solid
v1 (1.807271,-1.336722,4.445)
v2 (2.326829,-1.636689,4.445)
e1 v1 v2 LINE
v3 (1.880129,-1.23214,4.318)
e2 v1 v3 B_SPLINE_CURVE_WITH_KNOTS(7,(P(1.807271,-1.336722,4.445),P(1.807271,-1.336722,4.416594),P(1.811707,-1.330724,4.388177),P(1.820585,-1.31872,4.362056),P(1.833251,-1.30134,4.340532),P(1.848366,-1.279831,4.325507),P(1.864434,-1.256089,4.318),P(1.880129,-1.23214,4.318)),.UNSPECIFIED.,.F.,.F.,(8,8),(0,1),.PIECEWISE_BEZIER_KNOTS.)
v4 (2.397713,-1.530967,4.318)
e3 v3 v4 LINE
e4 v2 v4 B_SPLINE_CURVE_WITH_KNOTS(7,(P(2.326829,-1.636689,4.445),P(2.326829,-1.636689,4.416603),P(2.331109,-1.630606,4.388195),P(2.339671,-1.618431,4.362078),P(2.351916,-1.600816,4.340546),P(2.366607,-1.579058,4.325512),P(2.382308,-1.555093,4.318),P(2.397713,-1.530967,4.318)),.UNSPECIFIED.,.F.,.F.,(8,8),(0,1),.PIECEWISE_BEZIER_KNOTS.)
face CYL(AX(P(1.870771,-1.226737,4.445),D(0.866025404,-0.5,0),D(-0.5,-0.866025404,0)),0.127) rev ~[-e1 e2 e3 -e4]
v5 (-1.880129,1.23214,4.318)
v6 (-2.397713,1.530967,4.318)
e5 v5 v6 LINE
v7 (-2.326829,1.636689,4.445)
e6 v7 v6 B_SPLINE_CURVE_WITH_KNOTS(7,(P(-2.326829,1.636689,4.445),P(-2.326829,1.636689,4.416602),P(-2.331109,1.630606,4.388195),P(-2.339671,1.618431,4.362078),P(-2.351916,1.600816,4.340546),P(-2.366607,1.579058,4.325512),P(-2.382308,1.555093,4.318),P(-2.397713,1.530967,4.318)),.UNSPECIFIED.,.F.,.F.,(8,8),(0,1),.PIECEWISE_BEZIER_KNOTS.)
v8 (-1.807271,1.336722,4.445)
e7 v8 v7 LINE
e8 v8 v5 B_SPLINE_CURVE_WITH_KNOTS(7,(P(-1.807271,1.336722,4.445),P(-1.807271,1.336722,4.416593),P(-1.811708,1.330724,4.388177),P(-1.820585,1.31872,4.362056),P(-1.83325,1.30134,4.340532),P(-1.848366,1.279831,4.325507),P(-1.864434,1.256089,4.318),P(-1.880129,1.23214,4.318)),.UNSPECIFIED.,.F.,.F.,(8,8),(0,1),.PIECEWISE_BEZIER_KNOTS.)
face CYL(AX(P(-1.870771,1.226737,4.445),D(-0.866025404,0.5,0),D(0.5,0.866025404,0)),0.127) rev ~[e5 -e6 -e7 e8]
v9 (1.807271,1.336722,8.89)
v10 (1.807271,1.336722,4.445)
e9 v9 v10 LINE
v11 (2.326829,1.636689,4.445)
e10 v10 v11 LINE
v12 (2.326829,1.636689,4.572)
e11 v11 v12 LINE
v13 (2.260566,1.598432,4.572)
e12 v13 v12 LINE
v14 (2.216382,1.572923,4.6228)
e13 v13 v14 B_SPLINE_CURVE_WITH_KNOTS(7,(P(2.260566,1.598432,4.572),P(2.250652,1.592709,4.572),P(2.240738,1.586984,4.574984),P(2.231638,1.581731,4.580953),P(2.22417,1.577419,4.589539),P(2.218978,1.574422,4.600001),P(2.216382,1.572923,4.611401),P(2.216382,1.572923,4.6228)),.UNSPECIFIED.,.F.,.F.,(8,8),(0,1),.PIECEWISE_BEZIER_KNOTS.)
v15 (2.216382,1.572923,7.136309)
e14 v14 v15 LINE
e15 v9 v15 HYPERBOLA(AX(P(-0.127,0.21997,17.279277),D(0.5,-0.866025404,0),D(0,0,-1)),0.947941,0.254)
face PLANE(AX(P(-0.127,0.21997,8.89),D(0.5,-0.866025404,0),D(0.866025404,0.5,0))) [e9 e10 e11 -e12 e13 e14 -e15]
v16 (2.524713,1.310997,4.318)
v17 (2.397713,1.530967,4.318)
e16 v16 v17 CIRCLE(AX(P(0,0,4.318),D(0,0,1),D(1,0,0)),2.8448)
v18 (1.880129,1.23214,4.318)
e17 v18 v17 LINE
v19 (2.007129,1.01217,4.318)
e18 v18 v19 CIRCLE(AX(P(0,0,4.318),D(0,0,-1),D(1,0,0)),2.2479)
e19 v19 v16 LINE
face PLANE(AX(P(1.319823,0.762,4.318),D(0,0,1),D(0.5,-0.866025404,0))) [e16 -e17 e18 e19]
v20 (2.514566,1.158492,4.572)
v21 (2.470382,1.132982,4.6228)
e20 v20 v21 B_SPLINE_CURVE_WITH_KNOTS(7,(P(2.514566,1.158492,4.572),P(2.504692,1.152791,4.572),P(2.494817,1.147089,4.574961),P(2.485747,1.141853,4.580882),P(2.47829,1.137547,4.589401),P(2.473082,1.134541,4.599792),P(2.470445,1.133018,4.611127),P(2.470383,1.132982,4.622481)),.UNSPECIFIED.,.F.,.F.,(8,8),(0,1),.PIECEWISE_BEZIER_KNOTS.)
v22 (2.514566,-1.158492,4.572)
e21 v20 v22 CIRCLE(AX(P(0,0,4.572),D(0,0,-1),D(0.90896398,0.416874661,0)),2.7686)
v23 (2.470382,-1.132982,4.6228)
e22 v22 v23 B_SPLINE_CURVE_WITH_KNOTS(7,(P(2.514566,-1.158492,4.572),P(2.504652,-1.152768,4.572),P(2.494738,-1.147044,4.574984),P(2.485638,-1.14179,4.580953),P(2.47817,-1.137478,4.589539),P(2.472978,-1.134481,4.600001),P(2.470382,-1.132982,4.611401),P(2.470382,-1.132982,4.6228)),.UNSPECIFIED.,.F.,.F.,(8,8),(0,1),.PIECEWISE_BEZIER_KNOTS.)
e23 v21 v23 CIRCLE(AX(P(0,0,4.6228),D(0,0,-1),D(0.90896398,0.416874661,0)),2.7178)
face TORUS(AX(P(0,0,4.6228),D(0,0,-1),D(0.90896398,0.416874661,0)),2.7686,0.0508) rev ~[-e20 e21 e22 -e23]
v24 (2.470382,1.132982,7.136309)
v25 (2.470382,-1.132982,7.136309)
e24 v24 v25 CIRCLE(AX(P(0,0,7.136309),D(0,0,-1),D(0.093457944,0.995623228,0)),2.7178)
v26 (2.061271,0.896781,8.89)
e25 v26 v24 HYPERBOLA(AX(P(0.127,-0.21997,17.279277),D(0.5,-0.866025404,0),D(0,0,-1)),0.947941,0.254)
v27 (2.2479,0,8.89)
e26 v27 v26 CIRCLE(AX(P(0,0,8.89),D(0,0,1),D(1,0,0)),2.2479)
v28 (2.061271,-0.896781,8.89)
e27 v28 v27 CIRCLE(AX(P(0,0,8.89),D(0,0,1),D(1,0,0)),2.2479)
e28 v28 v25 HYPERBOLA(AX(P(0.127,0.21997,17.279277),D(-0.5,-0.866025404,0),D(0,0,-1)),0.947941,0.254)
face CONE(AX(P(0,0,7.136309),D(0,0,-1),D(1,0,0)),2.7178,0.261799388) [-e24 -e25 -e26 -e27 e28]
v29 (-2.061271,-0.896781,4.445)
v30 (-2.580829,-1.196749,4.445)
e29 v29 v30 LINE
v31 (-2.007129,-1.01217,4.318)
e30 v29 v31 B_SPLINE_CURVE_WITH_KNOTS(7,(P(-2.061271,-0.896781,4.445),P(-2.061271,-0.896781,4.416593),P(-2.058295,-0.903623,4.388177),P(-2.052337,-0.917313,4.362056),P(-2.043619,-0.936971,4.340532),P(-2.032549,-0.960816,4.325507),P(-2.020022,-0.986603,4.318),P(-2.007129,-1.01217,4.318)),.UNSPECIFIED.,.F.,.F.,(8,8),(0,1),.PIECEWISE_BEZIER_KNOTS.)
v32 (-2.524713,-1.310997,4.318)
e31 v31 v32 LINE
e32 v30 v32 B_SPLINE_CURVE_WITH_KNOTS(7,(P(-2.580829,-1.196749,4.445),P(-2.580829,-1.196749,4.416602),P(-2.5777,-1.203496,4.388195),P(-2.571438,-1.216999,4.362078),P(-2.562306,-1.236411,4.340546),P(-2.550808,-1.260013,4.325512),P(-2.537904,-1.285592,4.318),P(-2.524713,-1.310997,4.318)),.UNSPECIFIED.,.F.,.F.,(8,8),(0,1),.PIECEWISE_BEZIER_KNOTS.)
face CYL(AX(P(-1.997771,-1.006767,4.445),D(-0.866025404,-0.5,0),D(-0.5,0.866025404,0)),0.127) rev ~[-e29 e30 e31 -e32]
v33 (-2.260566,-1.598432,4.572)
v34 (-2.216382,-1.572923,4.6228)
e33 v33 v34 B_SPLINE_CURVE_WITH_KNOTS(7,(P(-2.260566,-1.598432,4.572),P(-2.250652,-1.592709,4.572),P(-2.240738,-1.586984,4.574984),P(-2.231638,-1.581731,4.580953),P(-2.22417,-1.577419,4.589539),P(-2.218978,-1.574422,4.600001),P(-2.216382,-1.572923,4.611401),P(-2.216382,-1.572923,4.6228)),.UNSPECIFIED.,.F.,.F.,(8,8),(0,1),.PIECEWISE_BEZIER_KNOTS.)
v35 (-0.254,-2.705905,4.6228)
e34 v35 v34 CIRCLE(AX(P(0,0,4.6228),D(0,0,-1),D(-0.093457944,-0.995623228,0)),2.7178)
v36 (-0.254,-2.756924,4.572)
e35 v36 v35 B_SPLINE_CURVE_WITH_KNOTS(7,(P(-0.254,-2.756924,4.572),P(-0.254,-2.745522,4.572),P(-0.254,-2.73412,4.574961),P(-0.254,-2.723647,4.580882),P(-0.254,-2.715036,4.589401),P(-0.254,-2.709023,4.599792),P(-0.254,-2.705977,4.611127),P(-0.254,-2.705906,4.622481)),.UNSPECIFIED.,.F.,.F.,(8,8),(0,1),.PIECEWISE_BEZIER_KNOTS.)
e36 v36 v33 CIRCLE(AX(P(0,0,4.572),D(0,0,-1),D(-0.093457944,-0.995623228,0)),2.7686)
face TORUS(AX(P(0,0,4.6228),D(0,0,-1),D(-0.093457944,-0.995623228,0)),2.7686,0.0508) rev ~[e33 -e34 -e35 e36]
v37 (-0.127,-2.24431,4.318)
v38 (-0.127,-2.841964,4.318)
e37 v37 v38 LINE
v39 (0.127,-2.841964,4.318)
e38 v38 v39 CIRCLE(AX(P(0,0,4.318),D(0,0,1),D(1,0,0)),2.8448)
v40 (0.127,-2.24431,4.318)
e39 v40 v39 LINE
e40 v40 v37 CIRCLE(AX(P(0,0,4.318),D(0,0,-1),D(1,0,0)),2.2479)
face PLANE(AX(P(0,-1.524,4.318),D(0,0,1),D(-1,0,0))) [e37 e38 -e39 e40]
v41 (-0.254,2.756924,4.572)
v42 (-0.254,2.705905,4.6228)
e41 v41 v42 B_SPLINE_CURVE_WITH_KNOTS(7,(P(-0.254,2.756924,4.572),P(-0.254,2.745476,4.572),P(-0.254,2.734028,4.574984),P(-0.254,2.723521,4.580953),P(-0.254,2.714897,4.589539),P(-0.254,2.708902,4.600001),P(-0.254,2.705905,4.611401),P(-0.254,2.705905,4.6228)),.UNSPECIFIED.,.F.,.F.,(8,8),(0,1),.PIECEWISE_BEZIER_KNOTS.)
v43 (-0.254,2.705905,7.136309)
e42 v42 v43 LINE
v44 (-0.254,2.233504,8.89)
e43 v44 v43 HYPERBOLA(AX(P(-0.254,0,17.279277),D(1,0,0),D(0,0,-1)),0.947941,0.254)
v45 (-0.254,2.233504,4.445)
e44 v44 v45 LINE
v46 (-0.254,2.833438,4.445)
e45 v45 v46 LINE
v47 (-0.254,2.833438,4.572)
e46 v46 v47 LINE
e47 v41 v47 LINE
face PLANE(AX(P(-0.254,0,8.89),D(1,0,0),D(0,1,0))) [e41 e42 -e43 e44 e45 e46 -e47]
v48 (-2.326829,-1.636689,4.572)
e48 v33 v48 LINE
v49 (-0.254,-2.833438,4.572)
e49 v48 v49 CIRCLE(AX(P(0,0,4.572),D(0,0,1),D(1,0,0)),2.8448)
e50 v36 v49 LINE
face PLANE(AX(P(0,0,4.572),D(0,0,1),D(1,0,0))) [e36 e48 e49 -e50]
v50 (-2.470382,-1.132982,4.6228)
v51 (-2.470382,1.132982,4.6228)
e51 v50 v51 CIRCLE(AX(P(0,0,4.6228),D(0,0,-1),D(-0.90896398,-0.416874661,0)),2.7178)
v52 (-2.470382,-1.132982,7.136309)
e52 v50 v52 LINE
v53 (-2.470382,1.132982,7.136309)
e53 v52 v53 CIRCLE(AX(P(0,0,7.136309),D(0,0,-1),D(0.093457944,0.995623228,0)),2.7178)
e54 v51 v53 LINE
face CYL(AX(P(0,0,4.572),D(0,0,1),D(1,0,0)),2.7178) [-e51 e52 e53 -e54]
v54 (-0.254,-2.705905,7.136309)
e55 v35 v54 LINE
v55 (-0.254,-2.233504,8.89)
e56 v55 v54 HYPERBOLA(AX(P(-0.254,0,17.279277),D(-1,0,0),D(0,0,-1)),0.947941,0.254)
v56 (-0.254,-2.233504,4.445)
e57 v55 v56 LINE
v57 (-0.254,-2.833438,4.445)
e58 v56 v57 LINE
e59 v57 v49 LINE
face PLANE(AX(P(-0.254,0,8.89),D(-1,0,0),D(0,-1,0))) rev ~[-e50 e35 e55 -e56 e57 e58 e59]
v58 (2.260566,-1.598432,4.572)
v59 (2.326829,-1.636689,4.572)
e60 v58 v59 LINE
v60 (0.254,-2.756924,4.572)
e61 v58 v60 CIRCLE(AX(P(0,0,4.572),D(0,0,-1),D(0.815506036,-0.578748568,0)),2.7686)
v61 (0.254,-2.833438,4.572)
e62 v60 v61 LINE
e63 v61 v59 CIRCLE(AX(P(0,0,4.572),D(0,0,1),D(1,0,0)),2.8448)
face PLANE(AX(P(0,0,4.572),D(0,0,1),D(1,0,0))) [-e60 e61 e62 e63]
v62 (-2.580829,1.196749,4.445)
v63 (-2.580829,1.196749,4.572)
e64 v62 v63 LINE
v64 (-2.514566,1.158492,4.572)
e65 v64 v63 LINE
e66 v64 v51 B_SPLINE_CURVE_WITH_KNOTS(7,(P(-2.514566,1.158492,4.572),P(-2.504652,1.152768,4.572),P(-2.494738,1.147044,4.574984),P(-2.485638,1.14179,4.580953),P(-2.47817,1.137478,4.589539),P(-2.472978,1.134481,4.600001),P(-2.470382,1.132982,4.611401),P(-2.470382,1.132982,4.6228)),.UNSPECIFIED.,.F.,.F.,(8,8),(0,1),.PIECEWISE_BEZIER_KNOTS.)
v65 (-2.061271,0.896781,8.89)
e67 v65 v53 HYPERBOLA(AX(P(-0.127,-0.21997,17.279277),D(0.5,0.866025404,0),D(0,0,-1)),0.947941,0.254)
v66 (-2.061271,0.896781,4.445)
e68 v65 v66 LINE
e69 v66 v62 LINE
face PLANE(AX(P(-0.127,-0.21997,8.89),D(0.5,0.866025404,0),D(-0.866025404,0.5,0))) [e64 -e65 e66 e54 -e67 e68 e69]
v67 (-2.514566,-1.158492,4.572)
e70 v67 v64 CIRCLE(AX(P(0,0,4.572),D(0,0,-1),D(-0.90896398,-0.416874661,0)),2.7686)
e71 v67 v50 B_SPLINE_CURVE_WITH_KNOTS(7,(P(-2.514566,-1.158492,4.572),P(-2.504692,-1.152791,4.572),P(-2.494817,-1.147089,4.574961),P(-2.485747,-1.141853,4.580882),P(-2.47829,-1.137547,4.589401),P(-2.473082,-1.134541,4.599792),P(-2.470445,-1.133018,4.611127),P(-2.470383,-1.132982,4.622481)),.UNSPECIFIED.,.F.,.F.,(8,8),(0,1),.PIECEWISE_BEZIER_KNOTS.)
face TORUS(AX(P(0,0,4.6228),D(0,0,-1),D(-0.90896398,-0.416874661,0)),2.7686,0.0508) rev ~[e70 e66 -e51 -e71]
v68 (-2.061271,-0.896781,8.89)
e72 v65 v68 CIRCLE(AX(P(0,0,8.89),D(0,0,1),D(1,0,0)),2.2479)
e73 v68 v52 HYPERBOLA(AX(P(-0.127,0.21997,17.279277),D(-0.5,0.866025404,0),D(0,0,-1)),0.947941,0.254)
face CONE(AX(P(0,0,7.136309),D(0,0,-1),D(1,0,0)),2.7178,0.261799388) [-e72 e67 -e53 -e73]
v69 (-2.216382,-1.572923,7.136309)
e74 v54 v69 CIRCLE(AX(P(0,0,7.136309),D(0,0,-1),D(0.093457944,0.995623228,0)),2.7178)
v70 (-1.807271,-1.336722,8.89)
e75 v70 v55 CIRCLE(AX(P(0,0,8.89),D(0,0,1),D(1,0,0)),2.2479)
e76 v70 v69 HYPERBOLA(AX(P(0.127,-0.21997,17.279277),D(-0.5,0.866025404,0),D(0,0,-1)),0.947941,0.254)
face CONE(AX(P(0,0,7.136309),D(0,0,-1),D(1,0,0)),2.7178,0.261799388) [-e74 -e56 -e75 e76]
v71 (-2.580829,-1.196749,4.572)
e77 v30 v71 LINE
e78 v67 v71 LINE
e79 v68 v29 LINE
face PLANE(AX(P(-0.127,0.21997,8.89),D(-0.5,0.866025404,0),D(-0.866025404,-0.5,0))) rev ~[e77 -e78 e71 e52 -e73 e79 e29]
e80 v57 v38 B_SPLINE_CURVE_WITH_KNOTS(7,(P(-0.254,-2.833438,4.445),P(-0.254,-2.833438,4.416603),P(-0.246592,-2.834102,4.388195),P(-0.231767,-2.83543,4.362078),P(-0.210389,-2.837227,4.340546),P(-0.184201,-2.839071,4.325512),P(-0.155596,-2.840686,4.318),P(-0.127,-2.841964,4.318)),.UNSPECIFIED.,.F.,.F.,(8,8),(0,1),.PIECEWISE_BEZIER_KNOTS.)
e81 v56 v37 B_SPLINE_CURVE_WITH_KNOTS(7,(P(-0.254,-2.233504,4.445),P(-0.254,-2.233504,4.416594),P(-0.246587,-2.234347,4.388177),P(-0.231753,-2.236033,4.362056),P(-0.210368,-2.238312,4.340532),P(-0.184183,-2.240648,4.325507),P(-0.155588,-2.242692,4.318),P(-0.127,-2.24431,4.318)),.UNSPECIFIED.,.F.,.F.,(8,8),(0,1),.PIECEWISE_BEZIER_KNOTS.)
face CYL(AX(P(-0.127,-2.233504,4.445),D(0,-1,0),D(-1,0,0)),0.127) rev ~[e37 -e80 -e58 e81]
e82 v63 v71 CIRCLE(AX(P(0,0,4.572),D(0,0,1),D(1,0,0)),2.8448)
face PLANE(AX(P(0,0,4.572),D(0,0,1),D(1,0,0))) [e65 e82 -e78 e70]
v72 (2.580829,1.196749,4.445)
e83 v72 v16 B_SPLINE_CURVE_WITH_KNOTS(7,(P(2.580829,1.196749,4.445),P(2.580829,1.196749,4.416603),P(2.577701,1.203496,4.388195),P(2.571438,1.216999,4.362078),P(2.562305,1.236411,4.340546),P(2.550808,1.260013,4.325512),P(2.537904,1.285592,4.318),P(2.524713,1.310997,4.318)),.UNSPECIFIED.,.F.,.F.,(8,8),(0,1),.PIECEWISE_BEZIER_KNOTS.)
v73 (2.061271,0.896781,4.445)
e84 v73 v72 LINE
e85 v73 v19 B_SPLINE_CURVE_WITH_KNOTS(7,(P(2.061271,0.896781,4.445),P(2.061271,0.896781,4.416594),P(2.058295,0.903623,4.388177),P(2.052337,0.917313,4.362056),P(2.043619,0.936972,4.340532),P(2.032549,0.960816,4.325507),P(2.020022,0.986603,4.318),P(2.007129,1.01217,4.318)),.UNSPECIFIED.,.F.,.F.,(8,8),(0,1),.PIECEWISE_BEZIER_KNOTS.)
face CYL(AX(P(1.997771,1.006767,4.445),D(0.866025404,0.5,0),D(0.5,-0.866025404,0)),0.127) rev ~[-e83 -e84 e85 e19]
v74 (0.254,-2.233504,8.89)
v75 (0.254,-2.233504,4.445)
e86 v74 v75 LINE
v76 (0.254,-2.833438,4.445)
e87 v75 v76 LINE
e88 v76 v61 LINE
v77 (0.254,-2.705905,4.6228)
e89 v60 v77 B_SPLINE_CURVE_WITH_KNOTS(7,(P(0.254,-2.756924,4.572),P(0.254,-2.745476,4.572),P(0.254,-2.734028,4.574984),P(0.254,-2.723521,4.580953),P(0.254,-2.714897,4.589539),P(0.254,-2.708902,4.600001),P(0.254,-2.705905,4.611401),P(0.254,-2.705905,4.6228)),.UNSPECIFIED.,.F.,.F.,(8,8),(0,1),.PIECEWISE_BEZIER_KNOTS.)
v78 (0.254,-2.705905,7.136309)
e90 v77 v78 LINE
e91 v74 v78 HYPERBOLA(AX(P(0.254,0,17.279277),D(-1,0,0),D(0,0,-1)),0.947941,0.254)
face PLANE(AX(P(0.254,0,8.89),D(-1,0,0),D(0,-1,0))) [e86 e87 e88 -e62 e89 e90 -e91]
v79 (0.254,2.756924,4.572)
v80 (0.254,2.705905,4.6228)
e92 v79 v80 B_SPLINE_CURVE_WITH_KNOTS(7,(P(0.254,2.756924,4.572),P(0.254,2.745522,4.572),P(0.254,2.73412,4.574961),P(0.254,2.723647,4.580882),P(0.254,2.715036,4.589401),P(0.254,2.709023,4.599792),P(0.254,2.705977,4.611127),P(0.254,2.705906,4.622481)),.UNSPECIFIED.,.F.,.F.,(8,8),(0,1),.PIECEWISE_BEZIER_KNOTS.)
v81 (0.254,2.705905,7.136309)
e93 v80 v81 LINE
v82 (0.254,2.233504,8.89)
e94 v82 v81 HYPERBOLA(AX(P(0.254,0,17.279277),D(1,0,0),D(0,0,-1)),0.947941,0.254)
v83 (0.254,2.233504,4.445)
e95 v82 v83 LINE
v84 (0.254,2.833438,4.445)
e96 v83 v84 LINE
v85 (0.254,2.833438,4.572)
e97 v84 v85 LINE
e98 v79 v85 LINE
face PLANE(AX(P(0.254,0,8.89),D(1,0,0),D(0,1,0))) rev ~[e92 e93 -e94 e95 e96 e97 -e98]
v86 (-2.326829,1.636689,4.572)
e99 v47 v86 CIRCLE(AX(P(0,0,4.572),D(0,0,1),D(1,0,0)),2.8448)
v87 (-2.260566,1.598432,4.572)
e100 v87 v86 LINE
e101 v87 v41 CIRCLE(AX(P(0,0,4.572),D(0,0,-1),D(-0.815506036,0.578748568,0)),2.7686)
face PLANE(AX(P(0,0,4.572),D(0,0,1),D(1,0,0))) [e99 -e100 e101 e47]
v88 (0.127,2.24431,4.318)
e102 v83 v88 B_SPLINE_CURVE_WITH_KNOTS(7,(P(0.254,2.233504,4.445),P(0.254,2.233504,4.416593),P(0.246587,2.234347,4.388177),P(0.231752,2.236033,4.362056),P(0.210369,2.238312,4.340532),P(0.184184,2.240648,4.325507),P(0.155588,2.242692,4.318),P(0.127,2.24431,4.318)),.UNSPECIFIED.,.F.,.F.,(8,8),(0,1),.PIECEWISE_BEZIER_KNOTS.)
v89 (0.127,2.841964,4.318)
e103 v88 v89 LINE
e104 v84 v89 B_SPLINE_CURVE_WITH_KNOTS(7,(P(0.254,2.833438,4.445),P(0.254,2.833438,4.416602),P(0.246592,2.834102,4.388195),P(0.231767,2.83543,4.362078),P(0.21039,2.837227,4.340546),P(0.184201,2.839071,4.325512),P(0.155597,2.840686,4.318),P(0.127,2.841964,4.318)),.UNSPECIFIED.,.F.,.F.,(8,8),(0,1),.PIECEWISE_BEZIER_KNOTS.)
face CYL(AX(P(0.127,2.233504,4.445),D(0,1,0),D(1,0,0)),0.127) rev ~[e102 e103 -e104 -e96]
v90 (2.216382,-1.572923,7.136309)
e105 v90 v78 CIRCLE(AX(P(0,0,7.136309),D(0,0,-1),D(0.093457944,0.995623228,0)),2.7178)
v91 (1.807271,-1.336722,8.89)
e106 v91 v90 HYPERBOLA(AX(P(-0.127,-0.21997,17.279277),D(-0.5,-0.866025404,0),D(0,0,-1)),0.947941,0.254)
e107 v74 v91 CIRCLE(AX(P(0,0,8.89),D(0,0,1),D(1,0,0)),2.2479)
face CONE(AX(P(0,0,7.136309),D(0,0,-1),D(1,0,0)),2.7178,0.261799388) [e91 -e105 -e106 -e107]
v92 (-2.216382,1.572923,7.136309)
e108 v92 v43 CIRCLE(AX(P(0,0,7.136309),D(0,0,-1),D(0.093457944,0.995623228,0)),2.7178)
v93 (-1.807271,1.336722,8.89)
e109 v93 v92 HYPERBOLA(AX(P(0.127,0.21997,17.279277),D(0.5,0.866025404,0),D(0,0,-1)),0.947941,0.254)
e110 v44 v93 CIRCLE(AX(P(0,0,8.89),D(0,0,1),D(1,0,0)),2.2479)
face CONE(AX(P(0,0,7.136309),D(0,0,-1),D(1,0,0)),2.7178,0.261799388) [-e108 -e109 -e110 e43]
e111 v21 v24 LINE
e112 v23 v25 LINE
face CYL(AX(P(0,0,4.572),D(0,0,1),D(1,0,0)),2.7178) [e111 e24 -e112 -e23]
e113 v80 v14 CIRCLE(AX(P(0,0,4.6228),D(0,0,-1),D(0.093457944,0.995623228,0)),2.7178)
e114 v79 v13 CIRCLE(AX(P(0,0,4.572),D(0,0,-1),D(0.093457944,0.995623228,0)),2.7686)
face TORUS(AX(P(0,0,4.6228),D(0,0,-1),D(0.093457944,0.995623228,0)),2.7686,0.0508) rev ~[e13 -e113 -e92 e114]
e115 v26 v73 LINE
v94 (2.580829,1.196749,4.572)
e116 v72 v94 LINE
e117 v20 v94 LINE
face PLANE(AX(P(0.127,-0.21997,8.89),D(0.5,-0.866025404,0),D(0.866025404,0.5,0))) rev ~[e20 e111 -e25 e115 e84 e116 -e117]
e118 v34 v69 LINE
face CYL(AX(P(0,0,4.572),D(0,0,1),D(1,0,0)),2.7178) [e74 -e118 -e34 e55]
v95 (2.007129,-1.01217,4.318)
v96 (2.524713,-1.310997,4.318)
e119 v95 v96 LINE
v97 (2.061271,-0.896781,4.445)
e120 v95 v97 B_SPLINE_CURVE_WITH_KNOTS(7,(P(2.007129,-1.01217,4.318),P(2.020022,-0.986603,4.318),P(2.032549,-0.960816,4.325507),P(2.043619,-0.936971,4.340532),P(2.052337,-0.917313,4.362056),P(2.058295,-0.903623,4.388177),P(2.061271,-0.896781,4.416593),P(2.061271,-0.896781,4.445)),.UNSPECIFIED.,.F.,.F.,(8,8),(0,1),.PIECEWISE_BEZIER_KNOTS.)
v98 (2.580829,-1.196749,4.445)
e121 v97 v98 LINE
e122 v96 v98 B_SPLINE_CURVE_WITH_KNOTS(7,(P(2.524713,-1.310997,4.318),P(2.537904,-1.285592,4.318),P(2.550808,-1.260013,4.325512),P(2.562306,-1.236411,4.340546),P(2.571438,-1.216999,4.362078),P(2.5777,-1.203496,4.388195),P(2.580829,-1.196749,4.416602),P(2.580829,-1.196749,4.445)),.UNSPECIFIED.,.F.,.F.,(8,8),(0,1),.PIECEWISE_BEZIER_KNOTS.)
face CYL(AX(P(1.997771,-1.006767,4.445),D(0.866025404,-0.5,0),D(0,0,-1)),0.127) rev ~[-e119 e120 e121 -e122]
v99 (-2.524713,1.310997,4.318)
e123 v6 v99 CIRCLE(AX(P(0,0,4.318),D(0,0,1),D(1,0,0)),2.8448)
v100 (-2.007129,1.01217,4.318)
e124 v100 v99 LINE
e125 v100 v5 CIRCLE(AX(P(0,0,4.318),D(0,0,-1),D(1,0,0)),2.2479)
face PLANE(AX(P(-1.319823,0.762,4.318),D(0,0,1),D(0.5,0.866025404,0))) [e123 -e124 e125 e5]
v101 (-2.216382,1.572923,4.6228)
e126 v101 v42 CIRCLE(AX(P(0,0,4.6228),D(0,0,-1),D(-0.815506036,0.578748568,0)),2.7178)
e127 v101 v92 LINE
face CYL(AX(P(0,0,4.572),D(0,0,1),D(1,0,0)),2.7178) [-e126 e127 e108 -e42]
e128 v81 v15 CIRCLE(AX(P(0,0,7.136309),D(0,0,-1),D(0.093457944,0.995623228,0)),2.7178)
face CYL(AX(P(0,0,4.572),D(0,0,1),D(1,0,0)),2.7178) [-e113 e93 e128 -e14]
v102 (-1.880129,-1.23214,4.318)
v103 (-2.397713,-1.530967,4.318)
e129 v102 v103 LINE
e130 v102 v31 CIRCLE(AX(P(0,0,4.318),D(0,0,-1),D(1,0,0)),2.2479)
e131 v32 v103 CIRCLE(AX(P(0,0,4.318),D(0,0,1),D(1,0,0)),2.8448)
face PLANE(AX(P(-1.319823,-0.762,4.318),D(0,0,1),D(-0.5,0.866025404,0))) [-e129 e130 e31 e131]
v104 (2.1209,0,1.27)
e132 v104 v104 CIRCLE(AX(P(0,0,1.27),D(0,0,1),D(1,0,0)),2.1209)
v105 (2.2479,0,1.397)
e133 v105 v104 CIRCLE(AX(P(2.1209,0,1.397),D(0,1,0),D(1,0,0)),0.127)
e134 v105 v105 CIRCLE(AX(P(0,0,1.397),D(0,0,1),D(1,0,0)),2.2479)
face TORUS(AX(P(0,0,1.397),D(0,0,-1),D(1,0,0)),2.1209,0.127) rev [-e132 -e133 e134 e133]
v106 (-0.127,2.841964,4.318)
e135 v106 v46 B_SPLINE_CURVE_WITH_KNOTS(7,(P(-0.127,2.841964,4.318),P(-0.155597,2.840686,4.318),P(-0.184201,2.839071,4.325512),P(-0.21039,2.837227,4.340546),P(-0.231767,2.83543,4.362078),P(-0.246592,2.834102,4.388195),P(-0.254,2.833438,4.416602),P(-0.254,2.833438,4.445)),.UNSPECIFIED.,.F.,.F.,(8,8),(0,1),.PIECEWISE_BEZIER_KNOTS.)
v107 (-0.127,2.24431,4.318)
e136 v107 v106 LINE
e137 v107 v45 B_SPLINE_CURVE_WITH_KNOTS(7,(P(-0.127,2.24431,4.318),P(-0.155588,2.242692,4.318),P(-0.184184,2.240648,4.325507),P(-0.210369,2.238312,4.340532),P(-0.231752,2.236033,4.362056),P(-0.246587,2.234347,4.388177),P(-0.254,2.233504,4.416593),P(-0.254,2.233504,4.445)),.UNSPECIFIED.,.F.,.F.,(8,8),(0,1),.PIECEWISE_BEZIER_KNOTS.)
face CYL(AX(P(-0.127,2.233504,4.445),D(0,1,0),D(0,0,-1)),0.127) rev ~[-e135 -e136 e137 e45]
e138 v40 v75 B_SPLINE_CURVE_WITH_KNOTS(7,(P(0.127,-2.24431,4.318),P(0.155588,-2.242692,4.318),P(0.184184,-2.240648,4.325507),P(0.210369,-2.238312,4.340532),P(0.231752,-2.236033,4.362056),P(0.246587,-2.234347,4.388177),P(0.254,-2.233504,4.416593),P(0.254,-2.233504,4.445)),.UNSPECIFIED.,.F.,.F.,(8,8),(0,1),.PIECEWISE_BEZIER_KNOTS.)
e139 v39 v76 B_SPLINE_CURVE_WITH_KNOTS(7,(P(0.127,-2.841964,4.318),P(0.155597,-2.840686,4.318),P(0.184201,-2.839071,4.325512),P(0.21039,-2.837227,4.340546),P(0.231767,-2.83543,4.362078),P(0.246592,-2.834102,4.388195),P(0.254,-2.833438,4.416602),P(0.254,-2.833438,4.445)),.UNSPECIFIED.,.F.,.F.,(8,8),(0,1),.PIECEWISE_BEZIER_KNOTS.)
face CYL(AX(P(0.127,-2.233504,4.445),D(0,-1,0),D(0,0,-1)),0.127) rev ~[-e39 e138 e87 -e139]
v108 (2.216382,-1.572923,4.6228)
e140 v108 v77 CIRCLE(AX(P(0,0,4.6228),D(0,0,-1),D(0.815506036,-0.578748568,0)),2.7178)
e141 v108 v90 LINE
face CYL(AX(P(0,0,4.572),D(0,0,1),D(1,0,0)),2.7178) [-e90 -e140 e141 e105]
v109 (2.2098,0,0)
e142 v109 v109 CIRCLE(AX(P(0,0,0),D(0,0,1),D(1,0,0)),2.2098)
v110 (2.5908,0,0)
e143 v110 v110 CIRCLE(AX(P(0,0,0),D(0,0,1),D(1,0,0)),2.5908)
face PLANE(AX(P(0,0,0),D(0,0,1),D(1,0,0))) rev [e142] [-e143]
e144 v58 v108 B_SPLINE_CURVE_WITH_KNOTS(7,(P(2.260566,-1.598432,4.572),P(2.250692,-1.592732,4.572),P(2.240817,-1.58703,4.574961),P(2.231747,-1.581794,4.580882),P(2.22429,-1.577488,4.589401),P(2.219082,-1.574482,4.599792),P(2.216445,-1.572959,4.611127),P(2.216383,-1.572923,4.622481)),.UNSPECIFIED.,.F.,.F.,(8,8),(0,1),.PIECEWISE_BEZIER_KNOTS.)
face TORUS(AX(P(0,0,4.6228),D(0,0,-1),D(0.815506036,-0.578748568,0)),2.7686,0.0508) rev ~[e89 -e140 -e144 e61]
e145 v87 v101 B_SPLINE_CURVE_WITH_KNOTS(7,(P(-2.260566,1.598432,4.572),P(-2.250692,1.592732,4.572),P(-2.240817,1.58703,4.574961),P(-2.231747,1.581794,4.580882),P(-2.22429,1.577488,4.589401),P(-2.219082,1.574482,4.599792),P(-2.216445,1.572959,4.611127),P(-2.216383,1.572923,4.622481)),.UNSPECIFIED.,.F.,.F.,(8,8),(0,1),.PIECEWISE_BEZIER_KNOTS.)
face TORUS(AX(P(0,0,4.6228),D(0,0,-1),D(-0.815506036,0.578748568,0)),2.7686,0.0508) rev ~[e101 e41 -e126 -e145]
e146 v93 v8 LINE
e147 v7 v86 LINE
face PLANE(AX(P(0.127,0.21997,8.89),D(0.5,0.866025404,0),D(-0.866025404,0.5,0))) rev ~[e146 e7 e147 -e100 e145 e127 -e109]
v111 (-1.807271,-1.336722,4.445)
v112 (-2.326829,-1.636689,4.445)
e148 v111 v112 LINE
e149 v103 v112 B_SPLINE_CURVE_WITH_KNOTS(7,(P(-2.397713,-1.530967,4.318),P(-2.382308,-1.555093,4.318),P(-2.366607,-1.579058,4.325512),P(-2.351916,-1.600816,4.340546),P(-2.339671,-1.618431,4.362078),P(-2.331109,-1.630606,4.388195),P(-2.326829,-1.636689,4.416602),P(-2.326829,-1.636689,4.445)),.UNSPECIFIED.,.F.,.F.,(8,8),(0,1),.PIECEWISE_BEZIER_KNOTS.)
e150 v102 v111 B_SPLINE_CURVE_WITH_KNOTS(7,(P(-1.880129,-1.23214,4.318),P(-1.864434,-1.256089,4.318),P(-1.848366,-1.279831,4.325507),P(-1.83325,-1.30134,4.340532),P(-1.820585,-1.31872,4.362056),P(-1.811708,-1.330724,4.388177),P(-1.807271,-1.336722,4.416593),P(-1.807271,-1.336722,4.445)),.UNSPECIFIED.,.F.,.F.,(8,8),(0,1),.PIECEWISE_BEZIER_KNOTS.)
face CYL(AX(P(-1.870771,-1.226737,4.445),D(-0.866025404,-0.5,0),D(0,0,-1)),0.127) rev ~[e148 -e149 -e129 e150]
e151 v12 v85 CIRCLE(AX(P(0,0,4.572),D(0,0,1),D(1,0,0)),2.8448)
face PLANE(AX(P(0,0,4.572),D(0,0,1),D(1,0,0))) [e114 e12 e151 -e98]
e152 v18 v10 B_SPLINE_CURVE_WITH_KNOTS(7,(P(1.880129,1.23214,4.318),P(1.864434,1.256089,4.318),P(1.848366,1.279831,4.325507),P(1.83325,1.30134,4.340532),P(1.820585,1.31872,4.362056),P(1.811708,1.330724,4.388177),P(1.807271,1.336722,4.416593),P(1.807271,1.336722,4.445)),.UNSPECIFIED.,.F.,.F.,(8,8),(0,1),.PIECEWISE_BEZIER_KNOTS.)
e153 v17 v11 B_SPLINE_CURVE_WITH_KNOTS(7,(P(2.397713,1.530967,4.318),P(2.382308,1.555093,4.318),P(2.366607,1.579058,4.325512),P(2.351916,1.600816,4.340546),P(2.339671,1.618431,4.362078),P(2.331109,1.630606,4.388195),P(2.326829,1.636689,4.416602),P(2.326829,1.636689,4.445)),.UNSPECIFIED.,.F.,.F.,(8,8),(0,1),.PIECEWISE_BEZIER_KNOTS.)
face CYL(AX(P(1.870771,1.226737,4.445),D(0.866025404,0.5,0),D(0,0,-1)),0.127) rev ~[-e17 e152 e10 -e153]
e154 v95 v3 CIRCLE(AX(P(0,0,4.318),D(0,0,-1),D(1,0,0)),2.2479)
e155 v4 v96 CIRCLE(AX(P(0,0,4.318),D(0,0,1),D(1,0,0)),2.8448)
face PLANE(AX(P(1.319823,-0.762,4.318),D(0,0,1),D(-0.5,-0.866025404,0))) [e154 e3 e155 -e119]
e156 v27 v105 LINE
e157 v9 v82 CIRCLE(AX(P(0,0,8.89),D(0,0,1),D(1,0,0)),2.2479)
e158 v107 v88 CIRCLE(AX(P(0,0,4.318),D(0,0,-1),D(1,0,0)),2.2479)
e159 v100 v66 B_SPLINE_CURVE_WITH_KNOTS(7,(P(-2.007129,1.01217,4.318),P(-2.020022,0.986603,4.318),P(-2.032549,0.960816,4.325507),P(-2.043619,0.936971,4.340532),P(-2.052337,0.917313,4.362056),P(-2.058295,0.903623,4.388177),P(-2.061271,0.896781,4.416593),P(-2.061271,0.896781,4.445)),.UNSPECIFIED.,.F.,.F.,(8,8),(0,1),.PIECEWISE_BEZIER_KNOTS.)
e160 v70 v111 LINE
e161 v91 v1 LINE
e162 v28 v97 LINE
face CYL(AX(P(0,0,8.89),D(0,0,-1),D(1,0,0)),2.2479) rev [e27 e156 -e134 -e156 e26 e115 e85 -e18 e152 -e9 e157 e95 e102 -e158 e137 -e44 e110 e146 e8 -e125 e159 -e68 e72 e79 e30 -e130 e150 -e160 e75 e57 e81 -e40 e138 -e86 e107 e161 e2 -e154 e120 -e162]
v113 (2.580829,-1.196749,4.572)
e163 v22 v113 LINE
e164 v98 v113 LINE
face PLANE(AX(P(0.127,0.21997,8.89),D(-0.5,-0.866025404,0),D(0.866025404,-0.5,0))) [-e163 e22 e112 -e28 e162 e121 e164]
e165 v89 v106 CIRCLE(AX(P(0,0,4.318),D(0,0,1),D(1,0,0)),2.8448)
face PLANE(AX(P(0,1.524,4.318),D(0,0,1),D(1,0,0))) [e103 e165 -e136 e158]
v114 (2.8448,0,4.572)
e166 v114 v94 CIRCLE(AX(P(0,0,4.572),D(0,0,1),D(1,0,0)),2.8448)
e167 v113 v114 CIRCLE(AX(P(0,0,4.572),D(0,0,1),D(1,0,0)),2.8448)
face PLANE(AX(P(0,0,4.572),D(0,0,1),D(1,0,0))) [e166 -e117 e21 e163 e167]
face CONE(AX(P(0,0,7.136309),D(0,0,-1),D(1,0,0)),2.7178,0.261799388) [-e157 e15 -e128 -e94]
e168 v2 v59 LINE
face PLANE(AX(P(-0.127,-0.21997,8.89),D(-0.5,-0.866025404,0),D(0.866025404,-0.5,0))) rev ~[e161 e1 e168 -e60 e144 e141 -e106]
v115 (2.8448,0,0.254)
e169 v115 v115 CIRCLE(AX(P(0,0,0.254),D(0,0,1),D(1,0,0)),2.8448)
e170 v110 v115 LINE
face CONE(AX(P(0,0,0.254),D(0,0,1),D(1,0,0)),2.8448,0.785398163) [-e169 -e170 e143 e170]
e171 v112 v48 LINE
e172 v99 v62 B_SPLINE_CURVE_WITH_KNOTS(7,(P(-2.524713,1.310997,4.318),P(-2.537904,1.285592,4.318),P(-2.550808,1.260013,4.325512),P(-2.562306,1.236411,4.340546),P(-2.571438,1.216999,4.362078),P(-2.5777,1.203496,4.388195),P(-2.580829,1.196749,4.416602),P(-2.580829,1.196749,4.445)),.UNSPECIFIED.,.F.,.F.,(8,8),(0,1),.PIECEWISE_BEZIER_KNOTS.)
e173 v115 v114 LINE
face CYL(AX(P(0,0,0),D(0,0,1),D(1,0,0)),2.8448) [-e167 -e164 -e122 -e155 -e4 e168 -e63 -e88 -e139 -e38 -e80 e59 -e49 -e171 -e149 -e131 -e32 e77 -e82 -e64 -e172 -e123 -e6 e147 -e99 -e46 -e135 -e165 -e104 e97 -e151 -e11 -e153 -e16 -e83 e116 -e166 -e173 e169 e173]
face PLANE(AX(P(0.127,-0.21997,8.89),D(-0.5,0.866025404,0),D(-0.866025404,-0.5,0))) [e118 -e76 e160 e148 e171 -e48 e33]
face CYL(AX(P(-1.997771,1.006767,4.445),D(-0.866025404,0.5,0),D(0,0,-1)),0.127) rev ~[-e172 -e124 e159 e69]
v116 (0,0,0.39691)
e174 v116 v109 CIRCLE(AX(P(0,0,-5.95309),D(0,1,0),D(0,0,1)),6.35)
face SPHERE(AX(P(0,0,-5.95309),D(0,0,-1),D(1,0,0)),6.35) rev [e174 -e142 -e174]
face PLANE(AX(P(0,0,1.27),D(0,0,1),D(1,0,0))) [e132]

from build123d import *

# Parameters (mm, degrees)
F3_SIZE         = 0.254
F4_W            = 0.508
F4_H            = 3.048
F6_DEPTH        = 4.572
F6_COPIES_COUNT = 6
F7_R            = 0.127
F8_R            = 0.0508


# Not quite as in the source:
# - a pattern or mirror of a feature is missing from the dataset's text; its kind, count and spacing are read off the source's solid


with BuildPart() as f1:
    # F0 (on Front) → F1 (revolve)
    with BuildSketch(Plane.XZ):
        with BuildLine():
            Line((2.2098, 0), (2.8448, 0))
            Line((2.8448, 0), (2.8448, 4.572))
            Line((2.8448, 4.572), (2.7178, 4.572))
            Line((2.7178, 4.572), (2.7178, 7.1363093255))
            Line((2.7178, 7.1363093255), (2.2479, 8.89))
            Line((2.2479, 8.89), (2.2479, 1.397))
            ThreePointArc((2.2479, 1.397), (2.2107025612, 1.3071974388), (2.1209, 1.27))
            Line((2.1209, 1.27), (0, 1.27))
            Line((0, 1.27), (0, 0.3969097134))
            ThreePointArc((0, 0.3969097134), (1.1225811063, 0.2968946462), (2.2098, 0))
        make_face()
    revolve(axis=Axis((0, 0, 7.5646454352), (0, 0, 1)))

    # F3
    f3_edges = [f1.edges().sort_by_distance(p)[0] for p in [
        (-2.8448, 0, 0),
    ]]
    chamfer(f3_edges, length=F3_SIZE)

    # F4 (on offset) → F6 (cut)
    with BuildSketch(Plane.XY.offset(8.89)):
        with Locations((0, 1.524)):
            Rectangle(F4_W, F4_H)
    f6 = extrude(amount=-F6_DEPTH, mode=Mode.SUBTRACT)

    # F6_copies: F6 ×6 about axis
    f6_copies_axis = Axis((0, 0, 0), (0, 0, 1))
    for i in range(1, F6_COPIES_COUNT):
        add(f6.rotate(f6_copies_axis, i * 360 / F6_COPIES_COUNT), mode=Mode.SUBTRACT)

    # F7
    f7_edges = [f1.edges().sort_by_distance(p)[0] for p in [
        (-0.254, 2.533471, 4.318),
        (0.254, 2.533471, 4.318),
        (2.32105, 1.046765, 4.318),
        (2.06705, 1.486706, 4.318),
        (-2.06705, 1.486706, 4.318),
        (-2.32105, 1.046765, 4.318),
        (-2.32105, -1.046765, 4.318),
        (-2.06705, -1.486706, 4.318),
        (-0.254, -2.533471, 4.318),
        (0.254, -2.533471, 4.318),
        (2.06705, -1.486706, 4.318),
        (2.32105, -1.046765, 4.318),
    ]]
    fillet(f7_edges, radius=F7_R)

    # F8
    f8_edges = [f1.edges().sort_by_distance(p)[0] for p in [
        (2.7178, 0, 4.572),
        (1.3589, 2.353684, 4.572),
        (-1.3589, 2.353684, 4.572),
        (1.3589, -2.353684, 4.572),
        (-2.7178, 0, 4.572),
        (-1.3589, -2.353684, 4.572),
    ]]
    fillet(f8_edges, radius=F8_R)


solid = f1.part
